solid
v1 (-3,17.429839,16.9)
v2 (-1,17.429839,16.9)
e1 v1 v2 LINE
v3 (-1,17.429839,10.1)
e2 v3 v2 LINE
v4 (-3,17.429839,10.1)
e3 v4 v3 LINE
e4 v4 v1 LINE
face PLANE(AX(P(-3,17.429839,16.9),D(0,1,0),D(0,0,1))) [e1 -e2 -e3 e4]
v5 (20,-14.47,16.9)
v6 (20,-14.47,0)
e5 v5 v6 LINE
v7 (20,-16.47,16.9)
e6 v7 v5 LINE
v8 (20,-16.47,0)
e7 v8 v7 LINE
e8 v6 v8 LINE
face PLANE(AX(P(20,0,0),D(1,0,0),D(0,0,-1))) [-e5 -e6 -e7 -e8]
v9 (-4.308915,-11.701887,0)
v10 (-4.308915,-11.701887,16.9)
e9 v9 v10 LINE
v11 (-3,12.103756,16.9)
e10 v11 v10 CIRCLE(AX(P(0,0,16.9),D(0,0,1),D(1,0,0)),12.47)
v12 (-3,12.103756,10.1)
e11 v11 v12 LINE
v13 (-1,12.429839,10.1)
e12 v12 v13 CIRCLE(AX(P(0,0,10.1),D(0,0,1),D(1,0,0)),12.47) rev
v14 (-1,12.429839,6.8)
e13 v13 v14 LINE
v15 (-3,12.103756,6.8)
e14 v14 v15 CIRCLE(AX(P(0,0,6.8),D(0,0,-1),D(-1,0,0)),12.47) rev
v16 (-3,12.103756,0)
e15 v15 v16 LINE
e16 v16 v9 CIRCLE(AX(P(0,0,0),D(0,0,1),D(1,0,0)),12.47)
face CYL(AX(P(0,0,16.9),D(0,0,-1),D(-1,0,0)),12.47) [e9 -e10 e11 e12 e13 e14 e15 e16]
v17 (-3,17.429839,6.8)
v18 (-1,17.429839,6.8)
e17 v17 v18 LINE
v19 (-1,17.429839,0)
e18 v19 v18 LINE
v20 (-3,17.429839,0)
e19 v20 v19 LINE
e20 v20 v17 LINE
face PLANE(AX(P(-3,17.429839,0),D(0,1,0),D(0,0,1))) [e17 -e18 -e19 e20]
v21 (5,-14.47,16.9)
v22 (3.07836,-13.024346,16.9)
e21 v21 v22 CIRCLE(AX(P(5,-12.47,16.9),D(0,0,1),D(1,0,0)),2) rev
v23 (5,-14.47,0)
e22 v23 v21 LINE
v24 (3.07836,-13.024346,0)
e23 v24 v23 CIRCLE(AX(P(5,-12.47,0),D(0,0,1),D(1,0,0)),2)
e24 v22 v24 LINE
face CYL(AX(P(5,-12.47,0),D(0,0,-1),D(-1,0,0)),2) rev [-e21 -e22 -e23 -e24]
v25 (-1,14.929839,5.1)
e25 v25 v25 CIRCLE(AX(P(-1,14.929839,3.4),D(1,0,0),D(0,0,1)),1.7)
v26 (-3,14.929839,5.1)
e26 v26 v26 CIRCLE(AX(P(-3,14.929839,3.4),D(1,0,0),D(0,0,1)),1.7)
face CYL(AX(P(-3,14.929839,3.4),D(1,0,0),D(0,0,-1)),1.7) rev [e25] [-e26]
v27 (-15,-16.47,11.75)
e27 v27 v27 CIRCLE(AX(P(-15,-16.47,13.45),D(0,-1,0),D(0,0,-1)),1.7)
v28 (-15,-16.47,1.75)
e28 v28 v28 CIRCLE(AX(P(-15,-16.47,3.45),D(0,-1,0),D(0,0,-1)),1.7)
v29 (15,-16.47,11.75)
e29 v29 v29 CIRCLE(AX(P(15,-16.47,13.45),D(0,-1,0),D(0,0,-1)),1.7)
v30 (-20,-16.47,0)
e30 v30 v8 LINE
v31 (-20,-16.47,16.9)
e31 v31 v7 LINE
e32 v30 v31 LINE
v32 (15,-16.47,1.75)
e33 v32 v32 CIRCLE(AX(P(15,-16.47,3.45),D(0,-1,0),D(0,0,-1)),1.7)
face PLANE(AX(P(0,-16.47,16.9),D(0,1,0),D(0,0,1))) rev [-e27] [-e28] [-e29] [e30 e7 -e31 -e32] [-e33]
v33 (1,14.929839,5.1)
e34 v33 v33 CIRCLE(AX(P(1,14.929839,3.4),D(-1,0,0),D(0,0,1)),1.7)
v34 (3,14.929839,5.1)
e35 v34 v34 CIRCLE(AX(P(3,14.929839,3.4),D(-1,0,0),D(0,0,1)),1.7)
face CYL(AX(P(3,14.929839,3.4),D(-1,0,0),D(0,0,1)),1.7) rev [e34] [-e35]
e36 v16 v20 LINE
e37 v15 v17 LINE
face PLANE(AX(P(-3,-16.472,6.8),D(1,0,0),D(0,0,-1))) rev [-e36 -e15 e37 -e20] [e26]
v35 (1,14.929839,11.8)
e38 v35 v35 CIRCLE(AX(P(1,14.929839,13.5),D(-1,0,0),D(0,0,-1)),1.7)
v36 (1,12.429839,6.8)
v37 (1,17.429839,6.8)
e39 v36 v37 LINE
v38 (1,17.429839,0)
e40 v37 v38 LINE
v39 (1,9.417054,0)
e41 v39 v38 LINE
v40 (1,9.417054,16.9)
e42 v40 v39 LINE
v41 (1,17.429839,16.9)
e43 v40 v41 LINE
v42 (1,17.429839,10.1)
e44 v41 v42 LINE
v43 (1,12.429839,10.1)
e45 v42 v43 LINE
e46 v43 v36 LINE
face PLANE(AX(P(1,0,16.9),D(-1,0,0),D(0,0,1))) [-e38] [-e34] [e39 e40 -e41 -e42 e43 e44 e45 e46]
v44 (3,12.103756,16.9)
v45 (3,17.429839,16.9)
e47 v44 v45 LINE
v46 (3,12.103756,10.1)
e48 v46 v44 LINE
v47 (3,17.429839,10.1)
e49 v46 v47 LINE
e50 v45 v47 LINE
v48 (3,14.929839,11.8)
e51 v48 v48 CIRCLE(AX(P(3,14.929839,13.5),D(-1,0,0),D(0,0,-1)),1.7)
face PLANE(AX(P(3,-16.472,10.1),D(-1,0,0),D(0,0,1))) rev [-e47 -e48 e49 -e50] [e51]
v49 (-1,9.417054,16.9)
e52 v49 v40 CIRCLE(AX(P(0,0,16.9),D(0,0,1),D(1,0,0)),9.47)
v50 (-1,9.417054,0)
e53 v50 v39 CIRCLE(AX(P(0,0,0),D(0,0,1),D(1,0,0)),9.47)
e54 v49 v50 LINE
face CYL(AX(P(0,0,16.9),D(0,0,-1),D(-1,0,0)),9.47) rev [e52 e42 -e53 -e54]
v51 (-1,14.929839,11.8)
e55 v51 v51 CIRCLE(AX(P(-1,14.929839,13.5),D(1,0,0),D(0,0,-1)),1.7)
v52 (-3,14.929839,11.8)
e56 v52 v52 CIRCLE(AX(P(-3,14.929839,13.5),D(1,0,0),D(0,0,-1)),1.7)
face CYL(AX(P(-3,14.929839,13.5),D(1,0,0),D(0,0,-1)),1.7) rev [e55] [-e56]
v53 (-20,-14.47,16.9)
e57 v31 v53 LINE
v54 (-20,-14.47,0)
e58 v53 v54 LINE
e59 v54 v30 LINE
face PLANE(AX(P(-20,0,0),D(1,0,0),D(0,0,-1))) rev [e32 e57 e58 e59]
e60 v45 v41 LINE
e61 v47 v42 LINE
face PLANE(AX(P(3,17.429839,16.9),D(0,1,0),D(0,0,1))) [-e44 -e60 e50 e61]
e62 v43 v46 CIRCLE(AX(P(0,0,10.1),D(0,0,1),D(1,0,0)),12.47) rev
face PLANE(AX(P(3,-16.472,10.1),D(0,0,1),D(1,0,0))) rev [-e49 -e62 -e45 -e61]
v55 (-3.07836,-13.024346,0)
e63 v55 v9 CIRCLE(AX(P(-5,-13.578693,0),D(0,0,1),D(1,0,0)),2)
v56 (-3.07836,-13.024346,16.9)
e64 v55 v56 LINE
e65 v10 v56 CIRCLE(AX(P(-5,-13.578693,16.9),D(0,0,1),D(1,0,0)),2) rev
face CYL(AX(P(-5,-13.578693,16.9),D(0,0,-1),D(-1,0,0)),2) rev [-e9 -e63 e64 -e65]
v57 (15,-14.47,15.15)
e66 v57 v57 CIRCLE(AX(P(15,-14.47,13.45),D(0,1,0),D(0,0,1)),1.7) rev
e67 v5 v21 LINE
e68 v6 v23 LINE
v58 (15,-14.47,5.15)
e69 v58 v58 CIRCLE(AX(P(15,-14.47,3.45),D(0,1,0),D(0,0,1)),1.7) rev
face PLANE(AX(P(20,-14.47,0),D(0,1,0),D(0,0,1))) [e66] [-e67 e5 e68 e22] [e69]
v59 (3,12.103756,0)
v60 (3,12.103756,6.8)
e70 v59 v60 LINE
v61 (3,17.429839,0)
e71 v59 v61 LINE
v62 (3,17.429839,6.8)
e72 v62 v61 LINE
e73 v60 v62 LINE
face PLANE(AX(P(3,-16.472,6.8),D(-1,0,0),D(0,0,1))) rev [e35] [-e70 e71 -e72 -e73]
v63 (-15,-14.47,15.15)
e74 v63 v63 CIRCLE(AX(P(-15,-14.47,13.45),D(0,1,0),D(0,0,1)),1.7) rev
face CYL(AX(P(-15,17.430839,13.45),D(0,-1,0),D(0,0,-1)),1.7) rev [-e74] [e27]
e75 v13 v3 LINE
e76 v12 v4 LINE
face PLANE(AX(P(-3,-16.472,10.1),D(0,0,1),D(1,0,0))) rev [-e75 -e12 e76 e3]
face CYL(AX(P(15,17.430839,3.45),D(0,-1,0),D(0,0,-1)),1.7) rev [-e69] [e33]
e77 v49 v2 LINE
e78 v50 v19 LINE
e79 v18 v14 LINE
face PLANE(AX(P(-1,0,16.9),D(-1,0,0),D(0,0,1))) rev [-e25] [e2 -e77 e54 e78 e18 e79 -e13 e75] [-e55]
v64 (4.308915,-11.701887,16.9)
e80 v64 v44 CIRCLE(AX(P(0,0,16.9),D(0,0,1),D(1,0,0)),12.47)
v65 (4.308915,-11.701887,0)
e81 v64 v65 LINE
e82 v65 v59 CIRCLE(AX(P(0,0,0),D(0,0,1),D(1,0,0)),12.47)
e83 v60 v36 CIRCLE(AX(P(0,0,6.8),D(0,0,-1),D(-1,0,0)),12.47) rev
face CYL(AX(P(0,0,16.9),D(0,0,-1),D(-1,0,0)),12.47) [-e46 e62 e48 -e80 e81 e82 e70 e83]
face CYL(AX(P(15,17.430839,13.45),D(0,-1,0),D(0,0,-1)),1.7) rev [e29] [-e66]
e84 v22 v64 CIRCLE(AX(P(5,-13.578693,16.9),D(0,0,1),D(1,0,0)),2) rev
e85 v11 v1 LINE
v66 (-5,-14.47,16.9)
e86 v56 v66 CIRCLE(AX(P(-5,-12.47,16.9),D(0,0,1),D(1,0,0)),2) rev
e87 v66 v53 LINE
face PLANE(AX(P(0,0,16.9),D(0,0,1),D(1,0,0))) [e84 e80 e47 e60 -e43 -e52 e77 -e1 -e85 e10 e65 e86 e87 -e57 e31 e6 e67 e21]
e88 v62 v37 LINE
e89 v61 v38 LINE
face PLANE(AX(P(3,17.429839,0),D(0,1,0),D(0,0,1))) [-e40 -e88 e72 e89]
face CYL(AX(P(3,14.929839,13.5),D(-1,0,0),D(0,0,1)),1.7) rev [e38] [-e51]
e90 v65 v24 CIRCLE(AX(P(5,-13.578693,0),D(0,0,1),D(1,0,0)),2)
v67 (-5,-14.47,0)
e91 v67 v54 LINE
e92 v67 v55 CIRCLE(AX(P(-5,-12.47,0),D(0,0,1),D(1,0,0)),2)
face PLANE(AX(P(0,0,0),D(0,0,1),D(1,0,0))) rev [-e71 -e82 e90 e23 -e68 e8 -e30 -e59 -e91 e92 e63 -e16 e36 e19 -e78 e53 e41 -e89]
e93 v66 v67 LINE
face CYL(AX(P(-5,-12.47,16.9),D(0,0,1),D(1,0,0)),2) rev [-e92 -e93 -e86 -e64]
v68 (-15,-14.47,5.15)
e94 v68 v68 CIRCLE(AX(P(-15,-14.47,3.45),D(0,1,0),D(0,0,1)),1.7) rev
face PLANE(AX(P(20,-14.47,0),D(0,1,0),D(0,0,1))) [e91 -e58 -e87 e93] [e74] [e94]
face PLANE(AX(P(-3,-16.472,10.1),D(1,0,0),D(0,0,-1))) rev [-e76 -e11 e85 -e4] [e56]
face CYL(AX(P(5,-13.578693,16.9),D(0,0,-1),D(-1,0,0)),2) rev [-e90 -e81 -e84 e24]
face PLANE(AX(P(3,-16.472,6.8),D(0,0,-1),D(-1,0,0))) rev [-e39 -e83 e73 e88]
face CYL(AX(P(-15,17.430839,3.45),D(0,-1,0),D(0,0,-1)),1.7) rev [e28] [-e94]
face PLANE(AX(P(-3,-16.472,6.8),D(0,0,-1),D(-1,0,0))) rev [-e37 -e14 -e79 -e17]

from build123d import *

# Parameters (mm, degrees)
BOSS_EXTRUDE1_DEPTH      = 16.9
SKETCH2_W                = 6.8
SKETCH2_H                = 5
SKETCH2_R                = 1.7
BOSS_EXTRUDE2_DEPTH      = 2
BOSS_EXTRUDE2_2_DEPTH    = 2
BOSS_EXTRUDE3_REACH      = 37.726
BOSS_EXTRUDE3_END_RADIUS = 12.47
SKETCH5_W                = 2
SKETCH5_H                = 6.8
SKETCH7_W                = 6.8
SKETCH7_H                = 5
SKETCH7_R                = 1.7
BOSS_EXTRUDE4_DEPTH      = 2
BOSS_EXTRUDE4_2_DEPTH    = 2
BOSS_EXTRUDE5_REACH      = 37.726
BOSS_EXTRUDE5_END_RADIUS = 12.47
SKETCH8_W                = 2
SKETCH8_H                = 6.8
BOSS_EXTRUDE7_DEPTH      = 17
BOSS_EXTRUDE7_DEPTH_BACK = 23
SKETCH9_W                = 16.9
SKETCH9_H                = 2
CUT_EXTRUDE1_REACH       = 44.835
SKETCH10_R               = 1.7
FILLET1_R                = 2


with BuildPart() as part:
    # Sketch1 → Boss-Extrude1 (new body)
    with BuildSketch(Plane.XY):
        with BuildLine():
            ThreePointArc((9.47, 0), (-6.332886388, -7.040983596), (-1, 9.417053679))
            Line((-1, 9.417053679), (-1, 12.429839098))
            ThreePointArc((-1, 12.429839098), (-12.428769746, 1.01320413), (-3, -12.103755616))
            Line((-3, -12.103755616), (-3, -16.47))
            Line((-3, -16.47), (3, -16.47))
            Line((3, -16.47), (3, -12.103755616))
            ThreePointArc((3, -12.103755616), (12.428769746, 1.01320413), (1, 12.429839098))
            Line((1, 12.429839098), (1, 9.417053679))
            ThreePointArc((1, 9.417053679), (7.040983596, 6.332886388), (9.47, 0))
        make_face()
    extrude(amount=BOSS_EXTRUDE1_DEPTH)



with BuildPart() as body_2:
    # Sketch2 → Boss-Extrude2 (new body)
    with BuildSketch(Plane(origin=(-1, 0, 0), x_dir=(0, 0, -1), z_dir=(1, 0, 0))):
        with Locations((-13.5, 14.929839098)):
            Rectangle(SKETCH2_W, SKETCH2_H)
        with Locations((-13.5, 14.929839098)):
            Circle(SKETCH2_R, mode=Mode.SUBTRACT)
    extrude(amount=-BOSS_EXTRUDE2_DEPTH)


with BuildPart() as body_3:
    # Sketch2 → Boss-Extrude2 2 (new body)
    with BuildSketch(Plane(origin=(-1, 0, 0), x_dir=(0, 0, -1), z_dir=(1, 0, 0))):
        with Locations((-3.4, 14.929839098)):
            Rectangle(SKETCH2_W, SKETCH2_H)
        with Locations(Location((-3.4, 14.929839098, 0), (0, 0, 180))):
            Circle(SKETCH2_R, mode=Mode.SUBTRACT)
    extrude(amount=-BOSS_EXTRUDE2_2_DEPTH)


with BuildPart() as part_1:
    add(part.part)

    add(body_2.part)  # Boss-Extrude3 merges body 2

    add(body_3.part)  # Boss-Extrude3 merges body 3
    # Boss-Extrude3: up to this cylinder (the profile starts outside it)
    boss_extrude3_end = Plane(origin=(0, 0, 8.45), z_dir=(0, 0, -1)) * Cylinder(BOSS_EXTRUDE3_END_RADIUS, 111.492, mode=Mode.PRIVATE)
    # Sketch5 → Boss-Extrude3 (add, up to the surface)
    with BuildSketch(Plane.XZ.offset(-12.429839098), mode=Mode.PRIVATE) as boss_extrude3_sk1:
        with Locations((-2, 3.4)):
            Rectangle(SKETCH5_W, SKETCH5_H)
    boss_extrude3_tool1 = extrude(boss_extrude3_sk1.sketch, amount=BOSS_EXTRUDE3_REACH, mode=Mode.PRIVATE) - boss_extrude3_end
    add(boss_extrude3_tool1.solids().sort_by_distance((-2, 12.429839, 3.4))[0])
    # Sketch5 → Boss-Extrude3 (add, up to the surface)
    with BuildSketch(Plane.XZ.offset(-12.429839098), mode=Mode.PRIVATE) as boss_extrude3_sk2:
        with Locations((-2, 13.5)):
            Rectangle(SKETCH5_W, SKETCH5_H)
    boss_extrude3_tool2 = extrude(boss_extrude3_sk2.sketch, amount=BOSS_EXTRUDE3_REACH, mode=Mode.PRIVATE) - boss_extrude3_end
    add(boss_extrude3_tool2.solids().sort_by_distance((-2, 12.429839, 13.5))[0])



with BuildPart() as body_2_2:
    # Sketch7 → Boss-Extrude4 (new body)
    with BuildSketch(Plane.ZY.offset(-1)):
        with Locations((3.4, 14.929839098)):
            Rectangle(SKETCH7_W, SKETCH7_H)
        with Locations((3.4, 14.929839098)):
            Circle(SKETCH7_R, mode=Mode.SUBTRACT)
    extrude(amount=-BOSS_EXTRUDE4_DEPTH)


with BuildPart() as body_3_2:
    # Sketch7 → Boss-Extrude4 2 (new body)
    with BuildSketch(Plane.ZY.offset(-1)):
        with Locations((13.5, 14.929839098)):
            Rectangle(SKETCH7_W, SKETCH7_H)
        with Locations(Location((13.5, 14.929839098, 0), (0, 0, 180))):
            Circle(SKETCH7_R, mode=Mode.SUBTRACT)
    extrude(amount=-BOSS_EXTRUDE4_2_DEPTH)


with BuildPart() as part_2:
    add(part_1.part)

    add(body_2_2.part)  # Boss-Extrude5 merges body 2 2

    add(body_3_2.part)  # Boss-Extrude5 merges body 3 2
    # Boss-Extrude5: up to this cylinder (the profile starts outside it)
    boss_extrude5_end = Plane(origin=(0, 0, 8.45), z_dir=(0, 0, -1)) * Cylinder(BOSS_EXTRUDE5_END_RADIUS, 111.492, mode=Mode.PRIVATE)
    # Sketch8 → Boss-Extrude5 (add, up to the surface)
    with BuildSketch(Plane.XZ.offset(-12.429839098), mode=Mode.PRIVATE) as boss_extrude5_sk1:
        with Locations((2, 3.4)):
            Rectangle(SKETCH8_W, SKETCH8_H)
    boss_extrude5_tool1 = extrude(boss_extrude5_sk1.sketch, amount=BOSS_EXTRUDE5_REACH, mode=Mode.PRIVATE) - boss_extrude5_end
    add(boss_extrude5_tool1.solids().sort_by_distance((2, 12.429839, 3.4))[0])
    # Sketch8 → Boss-Extrude5 (add, up to the surface)
    with BuildSketch(Plane.XZ.offset(-12.429839098), mode=Mode.PRIVATE) as boss_extrude5_sk2:
        with Locations((2, 13.5)):
            Rectangle(SKETCH8_W, SKETCH8_H)
    boss_extrude5_tool2 = extrude(boss_extrude5_sk2.sketch, amount=BOSS_EXTRUDE5_REACH, mode=Mode.PRIVATE) - boss_extrude5_end
    add(boss_extrude5_tool2.solids().sort_by_distance((2, 12.429839, 13.5))[0])

    # Sketch9 → Boss-Extrude7 (add, two sides: drawn at the far end of the back side and taken through both)
    with BuildSketch(Plane.ZY.offset(3).offset(-BOSS_EXTRUDE7_DEPTH_BACK)):
        with Locations((8.45, -15.47)):
            Rectangle(SKETCH9_W, SKETCH9_H)
    extrude(amount=BOSS_EXTRUDE7_DEPTH + BOSS_EXTRUDE7_DEPTH_BACK)

    # Sketch10 → Cut-Extrude1 (cut, up to next)
    with BuildSketch(Plane.XZ.offset(16.47), mode=Mode.PRIVATE) as cut_extrude1_sk1:
        with Locations(Location((-15, 3.45, 0), (0, 0, 270))):
            Circle(SKETCH10_R)
    cut_extrude1_tool1 = extrude(cut_extrude1_sk1.sketch, amount=-CUT_EXTRUDE1_REACH, mode=Mode.PRIVATE) & part_2.part
    # Sketch10 → Cut-Extrude1 (cut, up to next)
    with BuildSketch(Plane.XZ.offset(16.47), mode=Mode.PRIVATE) as cut_extrude1_sk2:
        with Locations(Location((-15, 13.45, 0), (0, 0, 270))):
            Circle(SKETCH10_R)
    cut_extrude1_tool2 = extrude(cut_extrude1_sk2.sketch, amount=-CUT_EXTRUDE1_REACH, mode=Mode.PRIVATE) & part_2.part
    # Sketch10 → Cut-Extrude1 (cut, up to next)
    with BuildSketch(Plane.XZ.offset(16.47), mode=Mode.PRIVATE) as cut_extrude1_sk3:
        with Locations(Location((15, 3.45, 0), (0, 0, 270))):
            Circle(SKETCH10_R)
    cut_extrude1_tool3 = extrude(cut_extrude1_sk3.sketch, amount=-CUT_EXTRUDE1_REACH, mode=Mode.PRIVATE) & part_2.part
    # Sketch10 → Cut-Extrude1 (cut, up to next)
    with BuildSketch(Plane.XZ.offset(16.47), mode=Mode.PRIVATE) as cut_extrude1_sk4:
        with Locations(Location((15, 13.45, 0), (0, 0, 270))):
            Circle(SKETCH10_R)
    cut_extrude1_tool4 = extrude(cut_extrude1_sk4.sketch, amount=-CUT_EXTRUDE1_REACH, mode=Mode.PRIVATE) & part_2.part
    add(cut_extrude1_tool1.solids().sort_by_distance((-15, -16.47, 3.45))[0], mode=Mode.SUBTRACT)
    add(cut_extrude1_tool2.solids().sort_by_distance((-15, -16.47, 13.45))[0], mode=Mode.SUBTRACT)
    add(cut_extrude1_tool3.solids().sort_by_distance((15, -16.47, 3.45))[0], mode=Mode.SUBTRACT)
    add(cut_extrude1_tool4.solids().sort_by_distance((15, -16.47, 13.45))[0], mode=Mode.SUBTRACT)

    # Fillet1
    # the kernel refuses this fillet: 2 mm, written as the material it adds along each edge
    with BuildSketch(Plane(origin=(-3, -12.103755616, 0), x_dir=(-0.9559582766785055, 0.2935025949627393, 0), z_dir=(0, 0, 1))) as fillet1_piece_1:
        with BuildLine():
            CenterArc((1.479018642, 1.996983664), FILLET1_R, 197.067768115, 69.785084401)
            Line((-0.432897911, 1.409978474), (0, 0))
            ThreePointArc((0, 0), (0.684608852, 0.018806856), (1.369217704, 0))
        make_face()
    extrude(amount=16.9)
    with BuildSketch(Plane(origin=(-3, -14.47, 16.9), x_dir=(0, 1, 0), z_dir=(0, 0, -1))) as fillet1_piece_2:
        with BuildLine():
            CenterArc((FILLET1_R, -FILLET1_R), FILLET1_R, 90, 90)
            Line((0, -FILLET1_R), (0, 0))
            Line((0, 0), (FILLET1_R, 0))
        make_face()
    extrude(amount=16.9)
    with BuildSketch(Plane(origin=(3, -12.103755616, 0), x_dir=(0.9559582766785055, 0.2935025949627393, 0), z_dir=(0, 0, 1))) as fillet1_piece_3:
        with BuildLine():
            CenterArc((1.479018642, -1.996983664), FILLET1_R, 93.147147485, 69.785084401)
            Line((-0.432897911, -1.409978474), (0, 0))
            ThreePointArc((0, 0), (0.684608852, -0.018806856), (1.369217704, 0))
        make_face()
    extrude(amount=16.9)
    with BuildSketch(Plane(origin=(3, -14.47, 0), x_dir=(1, 0, 0), z_dir=(0, 0, 1))) as fillet1_piece_4:
        with BuildLine():
            CenterArc((FILLET1_R, FILLET1_R), FILLET1_R, 180, 90)
            Line((0, FILLET1_R), (0, 0))
            Line((0, 0), (FILLET1_R, 0))
        make_face()
    extrude(amount=16.9)


solid = part_2.part
